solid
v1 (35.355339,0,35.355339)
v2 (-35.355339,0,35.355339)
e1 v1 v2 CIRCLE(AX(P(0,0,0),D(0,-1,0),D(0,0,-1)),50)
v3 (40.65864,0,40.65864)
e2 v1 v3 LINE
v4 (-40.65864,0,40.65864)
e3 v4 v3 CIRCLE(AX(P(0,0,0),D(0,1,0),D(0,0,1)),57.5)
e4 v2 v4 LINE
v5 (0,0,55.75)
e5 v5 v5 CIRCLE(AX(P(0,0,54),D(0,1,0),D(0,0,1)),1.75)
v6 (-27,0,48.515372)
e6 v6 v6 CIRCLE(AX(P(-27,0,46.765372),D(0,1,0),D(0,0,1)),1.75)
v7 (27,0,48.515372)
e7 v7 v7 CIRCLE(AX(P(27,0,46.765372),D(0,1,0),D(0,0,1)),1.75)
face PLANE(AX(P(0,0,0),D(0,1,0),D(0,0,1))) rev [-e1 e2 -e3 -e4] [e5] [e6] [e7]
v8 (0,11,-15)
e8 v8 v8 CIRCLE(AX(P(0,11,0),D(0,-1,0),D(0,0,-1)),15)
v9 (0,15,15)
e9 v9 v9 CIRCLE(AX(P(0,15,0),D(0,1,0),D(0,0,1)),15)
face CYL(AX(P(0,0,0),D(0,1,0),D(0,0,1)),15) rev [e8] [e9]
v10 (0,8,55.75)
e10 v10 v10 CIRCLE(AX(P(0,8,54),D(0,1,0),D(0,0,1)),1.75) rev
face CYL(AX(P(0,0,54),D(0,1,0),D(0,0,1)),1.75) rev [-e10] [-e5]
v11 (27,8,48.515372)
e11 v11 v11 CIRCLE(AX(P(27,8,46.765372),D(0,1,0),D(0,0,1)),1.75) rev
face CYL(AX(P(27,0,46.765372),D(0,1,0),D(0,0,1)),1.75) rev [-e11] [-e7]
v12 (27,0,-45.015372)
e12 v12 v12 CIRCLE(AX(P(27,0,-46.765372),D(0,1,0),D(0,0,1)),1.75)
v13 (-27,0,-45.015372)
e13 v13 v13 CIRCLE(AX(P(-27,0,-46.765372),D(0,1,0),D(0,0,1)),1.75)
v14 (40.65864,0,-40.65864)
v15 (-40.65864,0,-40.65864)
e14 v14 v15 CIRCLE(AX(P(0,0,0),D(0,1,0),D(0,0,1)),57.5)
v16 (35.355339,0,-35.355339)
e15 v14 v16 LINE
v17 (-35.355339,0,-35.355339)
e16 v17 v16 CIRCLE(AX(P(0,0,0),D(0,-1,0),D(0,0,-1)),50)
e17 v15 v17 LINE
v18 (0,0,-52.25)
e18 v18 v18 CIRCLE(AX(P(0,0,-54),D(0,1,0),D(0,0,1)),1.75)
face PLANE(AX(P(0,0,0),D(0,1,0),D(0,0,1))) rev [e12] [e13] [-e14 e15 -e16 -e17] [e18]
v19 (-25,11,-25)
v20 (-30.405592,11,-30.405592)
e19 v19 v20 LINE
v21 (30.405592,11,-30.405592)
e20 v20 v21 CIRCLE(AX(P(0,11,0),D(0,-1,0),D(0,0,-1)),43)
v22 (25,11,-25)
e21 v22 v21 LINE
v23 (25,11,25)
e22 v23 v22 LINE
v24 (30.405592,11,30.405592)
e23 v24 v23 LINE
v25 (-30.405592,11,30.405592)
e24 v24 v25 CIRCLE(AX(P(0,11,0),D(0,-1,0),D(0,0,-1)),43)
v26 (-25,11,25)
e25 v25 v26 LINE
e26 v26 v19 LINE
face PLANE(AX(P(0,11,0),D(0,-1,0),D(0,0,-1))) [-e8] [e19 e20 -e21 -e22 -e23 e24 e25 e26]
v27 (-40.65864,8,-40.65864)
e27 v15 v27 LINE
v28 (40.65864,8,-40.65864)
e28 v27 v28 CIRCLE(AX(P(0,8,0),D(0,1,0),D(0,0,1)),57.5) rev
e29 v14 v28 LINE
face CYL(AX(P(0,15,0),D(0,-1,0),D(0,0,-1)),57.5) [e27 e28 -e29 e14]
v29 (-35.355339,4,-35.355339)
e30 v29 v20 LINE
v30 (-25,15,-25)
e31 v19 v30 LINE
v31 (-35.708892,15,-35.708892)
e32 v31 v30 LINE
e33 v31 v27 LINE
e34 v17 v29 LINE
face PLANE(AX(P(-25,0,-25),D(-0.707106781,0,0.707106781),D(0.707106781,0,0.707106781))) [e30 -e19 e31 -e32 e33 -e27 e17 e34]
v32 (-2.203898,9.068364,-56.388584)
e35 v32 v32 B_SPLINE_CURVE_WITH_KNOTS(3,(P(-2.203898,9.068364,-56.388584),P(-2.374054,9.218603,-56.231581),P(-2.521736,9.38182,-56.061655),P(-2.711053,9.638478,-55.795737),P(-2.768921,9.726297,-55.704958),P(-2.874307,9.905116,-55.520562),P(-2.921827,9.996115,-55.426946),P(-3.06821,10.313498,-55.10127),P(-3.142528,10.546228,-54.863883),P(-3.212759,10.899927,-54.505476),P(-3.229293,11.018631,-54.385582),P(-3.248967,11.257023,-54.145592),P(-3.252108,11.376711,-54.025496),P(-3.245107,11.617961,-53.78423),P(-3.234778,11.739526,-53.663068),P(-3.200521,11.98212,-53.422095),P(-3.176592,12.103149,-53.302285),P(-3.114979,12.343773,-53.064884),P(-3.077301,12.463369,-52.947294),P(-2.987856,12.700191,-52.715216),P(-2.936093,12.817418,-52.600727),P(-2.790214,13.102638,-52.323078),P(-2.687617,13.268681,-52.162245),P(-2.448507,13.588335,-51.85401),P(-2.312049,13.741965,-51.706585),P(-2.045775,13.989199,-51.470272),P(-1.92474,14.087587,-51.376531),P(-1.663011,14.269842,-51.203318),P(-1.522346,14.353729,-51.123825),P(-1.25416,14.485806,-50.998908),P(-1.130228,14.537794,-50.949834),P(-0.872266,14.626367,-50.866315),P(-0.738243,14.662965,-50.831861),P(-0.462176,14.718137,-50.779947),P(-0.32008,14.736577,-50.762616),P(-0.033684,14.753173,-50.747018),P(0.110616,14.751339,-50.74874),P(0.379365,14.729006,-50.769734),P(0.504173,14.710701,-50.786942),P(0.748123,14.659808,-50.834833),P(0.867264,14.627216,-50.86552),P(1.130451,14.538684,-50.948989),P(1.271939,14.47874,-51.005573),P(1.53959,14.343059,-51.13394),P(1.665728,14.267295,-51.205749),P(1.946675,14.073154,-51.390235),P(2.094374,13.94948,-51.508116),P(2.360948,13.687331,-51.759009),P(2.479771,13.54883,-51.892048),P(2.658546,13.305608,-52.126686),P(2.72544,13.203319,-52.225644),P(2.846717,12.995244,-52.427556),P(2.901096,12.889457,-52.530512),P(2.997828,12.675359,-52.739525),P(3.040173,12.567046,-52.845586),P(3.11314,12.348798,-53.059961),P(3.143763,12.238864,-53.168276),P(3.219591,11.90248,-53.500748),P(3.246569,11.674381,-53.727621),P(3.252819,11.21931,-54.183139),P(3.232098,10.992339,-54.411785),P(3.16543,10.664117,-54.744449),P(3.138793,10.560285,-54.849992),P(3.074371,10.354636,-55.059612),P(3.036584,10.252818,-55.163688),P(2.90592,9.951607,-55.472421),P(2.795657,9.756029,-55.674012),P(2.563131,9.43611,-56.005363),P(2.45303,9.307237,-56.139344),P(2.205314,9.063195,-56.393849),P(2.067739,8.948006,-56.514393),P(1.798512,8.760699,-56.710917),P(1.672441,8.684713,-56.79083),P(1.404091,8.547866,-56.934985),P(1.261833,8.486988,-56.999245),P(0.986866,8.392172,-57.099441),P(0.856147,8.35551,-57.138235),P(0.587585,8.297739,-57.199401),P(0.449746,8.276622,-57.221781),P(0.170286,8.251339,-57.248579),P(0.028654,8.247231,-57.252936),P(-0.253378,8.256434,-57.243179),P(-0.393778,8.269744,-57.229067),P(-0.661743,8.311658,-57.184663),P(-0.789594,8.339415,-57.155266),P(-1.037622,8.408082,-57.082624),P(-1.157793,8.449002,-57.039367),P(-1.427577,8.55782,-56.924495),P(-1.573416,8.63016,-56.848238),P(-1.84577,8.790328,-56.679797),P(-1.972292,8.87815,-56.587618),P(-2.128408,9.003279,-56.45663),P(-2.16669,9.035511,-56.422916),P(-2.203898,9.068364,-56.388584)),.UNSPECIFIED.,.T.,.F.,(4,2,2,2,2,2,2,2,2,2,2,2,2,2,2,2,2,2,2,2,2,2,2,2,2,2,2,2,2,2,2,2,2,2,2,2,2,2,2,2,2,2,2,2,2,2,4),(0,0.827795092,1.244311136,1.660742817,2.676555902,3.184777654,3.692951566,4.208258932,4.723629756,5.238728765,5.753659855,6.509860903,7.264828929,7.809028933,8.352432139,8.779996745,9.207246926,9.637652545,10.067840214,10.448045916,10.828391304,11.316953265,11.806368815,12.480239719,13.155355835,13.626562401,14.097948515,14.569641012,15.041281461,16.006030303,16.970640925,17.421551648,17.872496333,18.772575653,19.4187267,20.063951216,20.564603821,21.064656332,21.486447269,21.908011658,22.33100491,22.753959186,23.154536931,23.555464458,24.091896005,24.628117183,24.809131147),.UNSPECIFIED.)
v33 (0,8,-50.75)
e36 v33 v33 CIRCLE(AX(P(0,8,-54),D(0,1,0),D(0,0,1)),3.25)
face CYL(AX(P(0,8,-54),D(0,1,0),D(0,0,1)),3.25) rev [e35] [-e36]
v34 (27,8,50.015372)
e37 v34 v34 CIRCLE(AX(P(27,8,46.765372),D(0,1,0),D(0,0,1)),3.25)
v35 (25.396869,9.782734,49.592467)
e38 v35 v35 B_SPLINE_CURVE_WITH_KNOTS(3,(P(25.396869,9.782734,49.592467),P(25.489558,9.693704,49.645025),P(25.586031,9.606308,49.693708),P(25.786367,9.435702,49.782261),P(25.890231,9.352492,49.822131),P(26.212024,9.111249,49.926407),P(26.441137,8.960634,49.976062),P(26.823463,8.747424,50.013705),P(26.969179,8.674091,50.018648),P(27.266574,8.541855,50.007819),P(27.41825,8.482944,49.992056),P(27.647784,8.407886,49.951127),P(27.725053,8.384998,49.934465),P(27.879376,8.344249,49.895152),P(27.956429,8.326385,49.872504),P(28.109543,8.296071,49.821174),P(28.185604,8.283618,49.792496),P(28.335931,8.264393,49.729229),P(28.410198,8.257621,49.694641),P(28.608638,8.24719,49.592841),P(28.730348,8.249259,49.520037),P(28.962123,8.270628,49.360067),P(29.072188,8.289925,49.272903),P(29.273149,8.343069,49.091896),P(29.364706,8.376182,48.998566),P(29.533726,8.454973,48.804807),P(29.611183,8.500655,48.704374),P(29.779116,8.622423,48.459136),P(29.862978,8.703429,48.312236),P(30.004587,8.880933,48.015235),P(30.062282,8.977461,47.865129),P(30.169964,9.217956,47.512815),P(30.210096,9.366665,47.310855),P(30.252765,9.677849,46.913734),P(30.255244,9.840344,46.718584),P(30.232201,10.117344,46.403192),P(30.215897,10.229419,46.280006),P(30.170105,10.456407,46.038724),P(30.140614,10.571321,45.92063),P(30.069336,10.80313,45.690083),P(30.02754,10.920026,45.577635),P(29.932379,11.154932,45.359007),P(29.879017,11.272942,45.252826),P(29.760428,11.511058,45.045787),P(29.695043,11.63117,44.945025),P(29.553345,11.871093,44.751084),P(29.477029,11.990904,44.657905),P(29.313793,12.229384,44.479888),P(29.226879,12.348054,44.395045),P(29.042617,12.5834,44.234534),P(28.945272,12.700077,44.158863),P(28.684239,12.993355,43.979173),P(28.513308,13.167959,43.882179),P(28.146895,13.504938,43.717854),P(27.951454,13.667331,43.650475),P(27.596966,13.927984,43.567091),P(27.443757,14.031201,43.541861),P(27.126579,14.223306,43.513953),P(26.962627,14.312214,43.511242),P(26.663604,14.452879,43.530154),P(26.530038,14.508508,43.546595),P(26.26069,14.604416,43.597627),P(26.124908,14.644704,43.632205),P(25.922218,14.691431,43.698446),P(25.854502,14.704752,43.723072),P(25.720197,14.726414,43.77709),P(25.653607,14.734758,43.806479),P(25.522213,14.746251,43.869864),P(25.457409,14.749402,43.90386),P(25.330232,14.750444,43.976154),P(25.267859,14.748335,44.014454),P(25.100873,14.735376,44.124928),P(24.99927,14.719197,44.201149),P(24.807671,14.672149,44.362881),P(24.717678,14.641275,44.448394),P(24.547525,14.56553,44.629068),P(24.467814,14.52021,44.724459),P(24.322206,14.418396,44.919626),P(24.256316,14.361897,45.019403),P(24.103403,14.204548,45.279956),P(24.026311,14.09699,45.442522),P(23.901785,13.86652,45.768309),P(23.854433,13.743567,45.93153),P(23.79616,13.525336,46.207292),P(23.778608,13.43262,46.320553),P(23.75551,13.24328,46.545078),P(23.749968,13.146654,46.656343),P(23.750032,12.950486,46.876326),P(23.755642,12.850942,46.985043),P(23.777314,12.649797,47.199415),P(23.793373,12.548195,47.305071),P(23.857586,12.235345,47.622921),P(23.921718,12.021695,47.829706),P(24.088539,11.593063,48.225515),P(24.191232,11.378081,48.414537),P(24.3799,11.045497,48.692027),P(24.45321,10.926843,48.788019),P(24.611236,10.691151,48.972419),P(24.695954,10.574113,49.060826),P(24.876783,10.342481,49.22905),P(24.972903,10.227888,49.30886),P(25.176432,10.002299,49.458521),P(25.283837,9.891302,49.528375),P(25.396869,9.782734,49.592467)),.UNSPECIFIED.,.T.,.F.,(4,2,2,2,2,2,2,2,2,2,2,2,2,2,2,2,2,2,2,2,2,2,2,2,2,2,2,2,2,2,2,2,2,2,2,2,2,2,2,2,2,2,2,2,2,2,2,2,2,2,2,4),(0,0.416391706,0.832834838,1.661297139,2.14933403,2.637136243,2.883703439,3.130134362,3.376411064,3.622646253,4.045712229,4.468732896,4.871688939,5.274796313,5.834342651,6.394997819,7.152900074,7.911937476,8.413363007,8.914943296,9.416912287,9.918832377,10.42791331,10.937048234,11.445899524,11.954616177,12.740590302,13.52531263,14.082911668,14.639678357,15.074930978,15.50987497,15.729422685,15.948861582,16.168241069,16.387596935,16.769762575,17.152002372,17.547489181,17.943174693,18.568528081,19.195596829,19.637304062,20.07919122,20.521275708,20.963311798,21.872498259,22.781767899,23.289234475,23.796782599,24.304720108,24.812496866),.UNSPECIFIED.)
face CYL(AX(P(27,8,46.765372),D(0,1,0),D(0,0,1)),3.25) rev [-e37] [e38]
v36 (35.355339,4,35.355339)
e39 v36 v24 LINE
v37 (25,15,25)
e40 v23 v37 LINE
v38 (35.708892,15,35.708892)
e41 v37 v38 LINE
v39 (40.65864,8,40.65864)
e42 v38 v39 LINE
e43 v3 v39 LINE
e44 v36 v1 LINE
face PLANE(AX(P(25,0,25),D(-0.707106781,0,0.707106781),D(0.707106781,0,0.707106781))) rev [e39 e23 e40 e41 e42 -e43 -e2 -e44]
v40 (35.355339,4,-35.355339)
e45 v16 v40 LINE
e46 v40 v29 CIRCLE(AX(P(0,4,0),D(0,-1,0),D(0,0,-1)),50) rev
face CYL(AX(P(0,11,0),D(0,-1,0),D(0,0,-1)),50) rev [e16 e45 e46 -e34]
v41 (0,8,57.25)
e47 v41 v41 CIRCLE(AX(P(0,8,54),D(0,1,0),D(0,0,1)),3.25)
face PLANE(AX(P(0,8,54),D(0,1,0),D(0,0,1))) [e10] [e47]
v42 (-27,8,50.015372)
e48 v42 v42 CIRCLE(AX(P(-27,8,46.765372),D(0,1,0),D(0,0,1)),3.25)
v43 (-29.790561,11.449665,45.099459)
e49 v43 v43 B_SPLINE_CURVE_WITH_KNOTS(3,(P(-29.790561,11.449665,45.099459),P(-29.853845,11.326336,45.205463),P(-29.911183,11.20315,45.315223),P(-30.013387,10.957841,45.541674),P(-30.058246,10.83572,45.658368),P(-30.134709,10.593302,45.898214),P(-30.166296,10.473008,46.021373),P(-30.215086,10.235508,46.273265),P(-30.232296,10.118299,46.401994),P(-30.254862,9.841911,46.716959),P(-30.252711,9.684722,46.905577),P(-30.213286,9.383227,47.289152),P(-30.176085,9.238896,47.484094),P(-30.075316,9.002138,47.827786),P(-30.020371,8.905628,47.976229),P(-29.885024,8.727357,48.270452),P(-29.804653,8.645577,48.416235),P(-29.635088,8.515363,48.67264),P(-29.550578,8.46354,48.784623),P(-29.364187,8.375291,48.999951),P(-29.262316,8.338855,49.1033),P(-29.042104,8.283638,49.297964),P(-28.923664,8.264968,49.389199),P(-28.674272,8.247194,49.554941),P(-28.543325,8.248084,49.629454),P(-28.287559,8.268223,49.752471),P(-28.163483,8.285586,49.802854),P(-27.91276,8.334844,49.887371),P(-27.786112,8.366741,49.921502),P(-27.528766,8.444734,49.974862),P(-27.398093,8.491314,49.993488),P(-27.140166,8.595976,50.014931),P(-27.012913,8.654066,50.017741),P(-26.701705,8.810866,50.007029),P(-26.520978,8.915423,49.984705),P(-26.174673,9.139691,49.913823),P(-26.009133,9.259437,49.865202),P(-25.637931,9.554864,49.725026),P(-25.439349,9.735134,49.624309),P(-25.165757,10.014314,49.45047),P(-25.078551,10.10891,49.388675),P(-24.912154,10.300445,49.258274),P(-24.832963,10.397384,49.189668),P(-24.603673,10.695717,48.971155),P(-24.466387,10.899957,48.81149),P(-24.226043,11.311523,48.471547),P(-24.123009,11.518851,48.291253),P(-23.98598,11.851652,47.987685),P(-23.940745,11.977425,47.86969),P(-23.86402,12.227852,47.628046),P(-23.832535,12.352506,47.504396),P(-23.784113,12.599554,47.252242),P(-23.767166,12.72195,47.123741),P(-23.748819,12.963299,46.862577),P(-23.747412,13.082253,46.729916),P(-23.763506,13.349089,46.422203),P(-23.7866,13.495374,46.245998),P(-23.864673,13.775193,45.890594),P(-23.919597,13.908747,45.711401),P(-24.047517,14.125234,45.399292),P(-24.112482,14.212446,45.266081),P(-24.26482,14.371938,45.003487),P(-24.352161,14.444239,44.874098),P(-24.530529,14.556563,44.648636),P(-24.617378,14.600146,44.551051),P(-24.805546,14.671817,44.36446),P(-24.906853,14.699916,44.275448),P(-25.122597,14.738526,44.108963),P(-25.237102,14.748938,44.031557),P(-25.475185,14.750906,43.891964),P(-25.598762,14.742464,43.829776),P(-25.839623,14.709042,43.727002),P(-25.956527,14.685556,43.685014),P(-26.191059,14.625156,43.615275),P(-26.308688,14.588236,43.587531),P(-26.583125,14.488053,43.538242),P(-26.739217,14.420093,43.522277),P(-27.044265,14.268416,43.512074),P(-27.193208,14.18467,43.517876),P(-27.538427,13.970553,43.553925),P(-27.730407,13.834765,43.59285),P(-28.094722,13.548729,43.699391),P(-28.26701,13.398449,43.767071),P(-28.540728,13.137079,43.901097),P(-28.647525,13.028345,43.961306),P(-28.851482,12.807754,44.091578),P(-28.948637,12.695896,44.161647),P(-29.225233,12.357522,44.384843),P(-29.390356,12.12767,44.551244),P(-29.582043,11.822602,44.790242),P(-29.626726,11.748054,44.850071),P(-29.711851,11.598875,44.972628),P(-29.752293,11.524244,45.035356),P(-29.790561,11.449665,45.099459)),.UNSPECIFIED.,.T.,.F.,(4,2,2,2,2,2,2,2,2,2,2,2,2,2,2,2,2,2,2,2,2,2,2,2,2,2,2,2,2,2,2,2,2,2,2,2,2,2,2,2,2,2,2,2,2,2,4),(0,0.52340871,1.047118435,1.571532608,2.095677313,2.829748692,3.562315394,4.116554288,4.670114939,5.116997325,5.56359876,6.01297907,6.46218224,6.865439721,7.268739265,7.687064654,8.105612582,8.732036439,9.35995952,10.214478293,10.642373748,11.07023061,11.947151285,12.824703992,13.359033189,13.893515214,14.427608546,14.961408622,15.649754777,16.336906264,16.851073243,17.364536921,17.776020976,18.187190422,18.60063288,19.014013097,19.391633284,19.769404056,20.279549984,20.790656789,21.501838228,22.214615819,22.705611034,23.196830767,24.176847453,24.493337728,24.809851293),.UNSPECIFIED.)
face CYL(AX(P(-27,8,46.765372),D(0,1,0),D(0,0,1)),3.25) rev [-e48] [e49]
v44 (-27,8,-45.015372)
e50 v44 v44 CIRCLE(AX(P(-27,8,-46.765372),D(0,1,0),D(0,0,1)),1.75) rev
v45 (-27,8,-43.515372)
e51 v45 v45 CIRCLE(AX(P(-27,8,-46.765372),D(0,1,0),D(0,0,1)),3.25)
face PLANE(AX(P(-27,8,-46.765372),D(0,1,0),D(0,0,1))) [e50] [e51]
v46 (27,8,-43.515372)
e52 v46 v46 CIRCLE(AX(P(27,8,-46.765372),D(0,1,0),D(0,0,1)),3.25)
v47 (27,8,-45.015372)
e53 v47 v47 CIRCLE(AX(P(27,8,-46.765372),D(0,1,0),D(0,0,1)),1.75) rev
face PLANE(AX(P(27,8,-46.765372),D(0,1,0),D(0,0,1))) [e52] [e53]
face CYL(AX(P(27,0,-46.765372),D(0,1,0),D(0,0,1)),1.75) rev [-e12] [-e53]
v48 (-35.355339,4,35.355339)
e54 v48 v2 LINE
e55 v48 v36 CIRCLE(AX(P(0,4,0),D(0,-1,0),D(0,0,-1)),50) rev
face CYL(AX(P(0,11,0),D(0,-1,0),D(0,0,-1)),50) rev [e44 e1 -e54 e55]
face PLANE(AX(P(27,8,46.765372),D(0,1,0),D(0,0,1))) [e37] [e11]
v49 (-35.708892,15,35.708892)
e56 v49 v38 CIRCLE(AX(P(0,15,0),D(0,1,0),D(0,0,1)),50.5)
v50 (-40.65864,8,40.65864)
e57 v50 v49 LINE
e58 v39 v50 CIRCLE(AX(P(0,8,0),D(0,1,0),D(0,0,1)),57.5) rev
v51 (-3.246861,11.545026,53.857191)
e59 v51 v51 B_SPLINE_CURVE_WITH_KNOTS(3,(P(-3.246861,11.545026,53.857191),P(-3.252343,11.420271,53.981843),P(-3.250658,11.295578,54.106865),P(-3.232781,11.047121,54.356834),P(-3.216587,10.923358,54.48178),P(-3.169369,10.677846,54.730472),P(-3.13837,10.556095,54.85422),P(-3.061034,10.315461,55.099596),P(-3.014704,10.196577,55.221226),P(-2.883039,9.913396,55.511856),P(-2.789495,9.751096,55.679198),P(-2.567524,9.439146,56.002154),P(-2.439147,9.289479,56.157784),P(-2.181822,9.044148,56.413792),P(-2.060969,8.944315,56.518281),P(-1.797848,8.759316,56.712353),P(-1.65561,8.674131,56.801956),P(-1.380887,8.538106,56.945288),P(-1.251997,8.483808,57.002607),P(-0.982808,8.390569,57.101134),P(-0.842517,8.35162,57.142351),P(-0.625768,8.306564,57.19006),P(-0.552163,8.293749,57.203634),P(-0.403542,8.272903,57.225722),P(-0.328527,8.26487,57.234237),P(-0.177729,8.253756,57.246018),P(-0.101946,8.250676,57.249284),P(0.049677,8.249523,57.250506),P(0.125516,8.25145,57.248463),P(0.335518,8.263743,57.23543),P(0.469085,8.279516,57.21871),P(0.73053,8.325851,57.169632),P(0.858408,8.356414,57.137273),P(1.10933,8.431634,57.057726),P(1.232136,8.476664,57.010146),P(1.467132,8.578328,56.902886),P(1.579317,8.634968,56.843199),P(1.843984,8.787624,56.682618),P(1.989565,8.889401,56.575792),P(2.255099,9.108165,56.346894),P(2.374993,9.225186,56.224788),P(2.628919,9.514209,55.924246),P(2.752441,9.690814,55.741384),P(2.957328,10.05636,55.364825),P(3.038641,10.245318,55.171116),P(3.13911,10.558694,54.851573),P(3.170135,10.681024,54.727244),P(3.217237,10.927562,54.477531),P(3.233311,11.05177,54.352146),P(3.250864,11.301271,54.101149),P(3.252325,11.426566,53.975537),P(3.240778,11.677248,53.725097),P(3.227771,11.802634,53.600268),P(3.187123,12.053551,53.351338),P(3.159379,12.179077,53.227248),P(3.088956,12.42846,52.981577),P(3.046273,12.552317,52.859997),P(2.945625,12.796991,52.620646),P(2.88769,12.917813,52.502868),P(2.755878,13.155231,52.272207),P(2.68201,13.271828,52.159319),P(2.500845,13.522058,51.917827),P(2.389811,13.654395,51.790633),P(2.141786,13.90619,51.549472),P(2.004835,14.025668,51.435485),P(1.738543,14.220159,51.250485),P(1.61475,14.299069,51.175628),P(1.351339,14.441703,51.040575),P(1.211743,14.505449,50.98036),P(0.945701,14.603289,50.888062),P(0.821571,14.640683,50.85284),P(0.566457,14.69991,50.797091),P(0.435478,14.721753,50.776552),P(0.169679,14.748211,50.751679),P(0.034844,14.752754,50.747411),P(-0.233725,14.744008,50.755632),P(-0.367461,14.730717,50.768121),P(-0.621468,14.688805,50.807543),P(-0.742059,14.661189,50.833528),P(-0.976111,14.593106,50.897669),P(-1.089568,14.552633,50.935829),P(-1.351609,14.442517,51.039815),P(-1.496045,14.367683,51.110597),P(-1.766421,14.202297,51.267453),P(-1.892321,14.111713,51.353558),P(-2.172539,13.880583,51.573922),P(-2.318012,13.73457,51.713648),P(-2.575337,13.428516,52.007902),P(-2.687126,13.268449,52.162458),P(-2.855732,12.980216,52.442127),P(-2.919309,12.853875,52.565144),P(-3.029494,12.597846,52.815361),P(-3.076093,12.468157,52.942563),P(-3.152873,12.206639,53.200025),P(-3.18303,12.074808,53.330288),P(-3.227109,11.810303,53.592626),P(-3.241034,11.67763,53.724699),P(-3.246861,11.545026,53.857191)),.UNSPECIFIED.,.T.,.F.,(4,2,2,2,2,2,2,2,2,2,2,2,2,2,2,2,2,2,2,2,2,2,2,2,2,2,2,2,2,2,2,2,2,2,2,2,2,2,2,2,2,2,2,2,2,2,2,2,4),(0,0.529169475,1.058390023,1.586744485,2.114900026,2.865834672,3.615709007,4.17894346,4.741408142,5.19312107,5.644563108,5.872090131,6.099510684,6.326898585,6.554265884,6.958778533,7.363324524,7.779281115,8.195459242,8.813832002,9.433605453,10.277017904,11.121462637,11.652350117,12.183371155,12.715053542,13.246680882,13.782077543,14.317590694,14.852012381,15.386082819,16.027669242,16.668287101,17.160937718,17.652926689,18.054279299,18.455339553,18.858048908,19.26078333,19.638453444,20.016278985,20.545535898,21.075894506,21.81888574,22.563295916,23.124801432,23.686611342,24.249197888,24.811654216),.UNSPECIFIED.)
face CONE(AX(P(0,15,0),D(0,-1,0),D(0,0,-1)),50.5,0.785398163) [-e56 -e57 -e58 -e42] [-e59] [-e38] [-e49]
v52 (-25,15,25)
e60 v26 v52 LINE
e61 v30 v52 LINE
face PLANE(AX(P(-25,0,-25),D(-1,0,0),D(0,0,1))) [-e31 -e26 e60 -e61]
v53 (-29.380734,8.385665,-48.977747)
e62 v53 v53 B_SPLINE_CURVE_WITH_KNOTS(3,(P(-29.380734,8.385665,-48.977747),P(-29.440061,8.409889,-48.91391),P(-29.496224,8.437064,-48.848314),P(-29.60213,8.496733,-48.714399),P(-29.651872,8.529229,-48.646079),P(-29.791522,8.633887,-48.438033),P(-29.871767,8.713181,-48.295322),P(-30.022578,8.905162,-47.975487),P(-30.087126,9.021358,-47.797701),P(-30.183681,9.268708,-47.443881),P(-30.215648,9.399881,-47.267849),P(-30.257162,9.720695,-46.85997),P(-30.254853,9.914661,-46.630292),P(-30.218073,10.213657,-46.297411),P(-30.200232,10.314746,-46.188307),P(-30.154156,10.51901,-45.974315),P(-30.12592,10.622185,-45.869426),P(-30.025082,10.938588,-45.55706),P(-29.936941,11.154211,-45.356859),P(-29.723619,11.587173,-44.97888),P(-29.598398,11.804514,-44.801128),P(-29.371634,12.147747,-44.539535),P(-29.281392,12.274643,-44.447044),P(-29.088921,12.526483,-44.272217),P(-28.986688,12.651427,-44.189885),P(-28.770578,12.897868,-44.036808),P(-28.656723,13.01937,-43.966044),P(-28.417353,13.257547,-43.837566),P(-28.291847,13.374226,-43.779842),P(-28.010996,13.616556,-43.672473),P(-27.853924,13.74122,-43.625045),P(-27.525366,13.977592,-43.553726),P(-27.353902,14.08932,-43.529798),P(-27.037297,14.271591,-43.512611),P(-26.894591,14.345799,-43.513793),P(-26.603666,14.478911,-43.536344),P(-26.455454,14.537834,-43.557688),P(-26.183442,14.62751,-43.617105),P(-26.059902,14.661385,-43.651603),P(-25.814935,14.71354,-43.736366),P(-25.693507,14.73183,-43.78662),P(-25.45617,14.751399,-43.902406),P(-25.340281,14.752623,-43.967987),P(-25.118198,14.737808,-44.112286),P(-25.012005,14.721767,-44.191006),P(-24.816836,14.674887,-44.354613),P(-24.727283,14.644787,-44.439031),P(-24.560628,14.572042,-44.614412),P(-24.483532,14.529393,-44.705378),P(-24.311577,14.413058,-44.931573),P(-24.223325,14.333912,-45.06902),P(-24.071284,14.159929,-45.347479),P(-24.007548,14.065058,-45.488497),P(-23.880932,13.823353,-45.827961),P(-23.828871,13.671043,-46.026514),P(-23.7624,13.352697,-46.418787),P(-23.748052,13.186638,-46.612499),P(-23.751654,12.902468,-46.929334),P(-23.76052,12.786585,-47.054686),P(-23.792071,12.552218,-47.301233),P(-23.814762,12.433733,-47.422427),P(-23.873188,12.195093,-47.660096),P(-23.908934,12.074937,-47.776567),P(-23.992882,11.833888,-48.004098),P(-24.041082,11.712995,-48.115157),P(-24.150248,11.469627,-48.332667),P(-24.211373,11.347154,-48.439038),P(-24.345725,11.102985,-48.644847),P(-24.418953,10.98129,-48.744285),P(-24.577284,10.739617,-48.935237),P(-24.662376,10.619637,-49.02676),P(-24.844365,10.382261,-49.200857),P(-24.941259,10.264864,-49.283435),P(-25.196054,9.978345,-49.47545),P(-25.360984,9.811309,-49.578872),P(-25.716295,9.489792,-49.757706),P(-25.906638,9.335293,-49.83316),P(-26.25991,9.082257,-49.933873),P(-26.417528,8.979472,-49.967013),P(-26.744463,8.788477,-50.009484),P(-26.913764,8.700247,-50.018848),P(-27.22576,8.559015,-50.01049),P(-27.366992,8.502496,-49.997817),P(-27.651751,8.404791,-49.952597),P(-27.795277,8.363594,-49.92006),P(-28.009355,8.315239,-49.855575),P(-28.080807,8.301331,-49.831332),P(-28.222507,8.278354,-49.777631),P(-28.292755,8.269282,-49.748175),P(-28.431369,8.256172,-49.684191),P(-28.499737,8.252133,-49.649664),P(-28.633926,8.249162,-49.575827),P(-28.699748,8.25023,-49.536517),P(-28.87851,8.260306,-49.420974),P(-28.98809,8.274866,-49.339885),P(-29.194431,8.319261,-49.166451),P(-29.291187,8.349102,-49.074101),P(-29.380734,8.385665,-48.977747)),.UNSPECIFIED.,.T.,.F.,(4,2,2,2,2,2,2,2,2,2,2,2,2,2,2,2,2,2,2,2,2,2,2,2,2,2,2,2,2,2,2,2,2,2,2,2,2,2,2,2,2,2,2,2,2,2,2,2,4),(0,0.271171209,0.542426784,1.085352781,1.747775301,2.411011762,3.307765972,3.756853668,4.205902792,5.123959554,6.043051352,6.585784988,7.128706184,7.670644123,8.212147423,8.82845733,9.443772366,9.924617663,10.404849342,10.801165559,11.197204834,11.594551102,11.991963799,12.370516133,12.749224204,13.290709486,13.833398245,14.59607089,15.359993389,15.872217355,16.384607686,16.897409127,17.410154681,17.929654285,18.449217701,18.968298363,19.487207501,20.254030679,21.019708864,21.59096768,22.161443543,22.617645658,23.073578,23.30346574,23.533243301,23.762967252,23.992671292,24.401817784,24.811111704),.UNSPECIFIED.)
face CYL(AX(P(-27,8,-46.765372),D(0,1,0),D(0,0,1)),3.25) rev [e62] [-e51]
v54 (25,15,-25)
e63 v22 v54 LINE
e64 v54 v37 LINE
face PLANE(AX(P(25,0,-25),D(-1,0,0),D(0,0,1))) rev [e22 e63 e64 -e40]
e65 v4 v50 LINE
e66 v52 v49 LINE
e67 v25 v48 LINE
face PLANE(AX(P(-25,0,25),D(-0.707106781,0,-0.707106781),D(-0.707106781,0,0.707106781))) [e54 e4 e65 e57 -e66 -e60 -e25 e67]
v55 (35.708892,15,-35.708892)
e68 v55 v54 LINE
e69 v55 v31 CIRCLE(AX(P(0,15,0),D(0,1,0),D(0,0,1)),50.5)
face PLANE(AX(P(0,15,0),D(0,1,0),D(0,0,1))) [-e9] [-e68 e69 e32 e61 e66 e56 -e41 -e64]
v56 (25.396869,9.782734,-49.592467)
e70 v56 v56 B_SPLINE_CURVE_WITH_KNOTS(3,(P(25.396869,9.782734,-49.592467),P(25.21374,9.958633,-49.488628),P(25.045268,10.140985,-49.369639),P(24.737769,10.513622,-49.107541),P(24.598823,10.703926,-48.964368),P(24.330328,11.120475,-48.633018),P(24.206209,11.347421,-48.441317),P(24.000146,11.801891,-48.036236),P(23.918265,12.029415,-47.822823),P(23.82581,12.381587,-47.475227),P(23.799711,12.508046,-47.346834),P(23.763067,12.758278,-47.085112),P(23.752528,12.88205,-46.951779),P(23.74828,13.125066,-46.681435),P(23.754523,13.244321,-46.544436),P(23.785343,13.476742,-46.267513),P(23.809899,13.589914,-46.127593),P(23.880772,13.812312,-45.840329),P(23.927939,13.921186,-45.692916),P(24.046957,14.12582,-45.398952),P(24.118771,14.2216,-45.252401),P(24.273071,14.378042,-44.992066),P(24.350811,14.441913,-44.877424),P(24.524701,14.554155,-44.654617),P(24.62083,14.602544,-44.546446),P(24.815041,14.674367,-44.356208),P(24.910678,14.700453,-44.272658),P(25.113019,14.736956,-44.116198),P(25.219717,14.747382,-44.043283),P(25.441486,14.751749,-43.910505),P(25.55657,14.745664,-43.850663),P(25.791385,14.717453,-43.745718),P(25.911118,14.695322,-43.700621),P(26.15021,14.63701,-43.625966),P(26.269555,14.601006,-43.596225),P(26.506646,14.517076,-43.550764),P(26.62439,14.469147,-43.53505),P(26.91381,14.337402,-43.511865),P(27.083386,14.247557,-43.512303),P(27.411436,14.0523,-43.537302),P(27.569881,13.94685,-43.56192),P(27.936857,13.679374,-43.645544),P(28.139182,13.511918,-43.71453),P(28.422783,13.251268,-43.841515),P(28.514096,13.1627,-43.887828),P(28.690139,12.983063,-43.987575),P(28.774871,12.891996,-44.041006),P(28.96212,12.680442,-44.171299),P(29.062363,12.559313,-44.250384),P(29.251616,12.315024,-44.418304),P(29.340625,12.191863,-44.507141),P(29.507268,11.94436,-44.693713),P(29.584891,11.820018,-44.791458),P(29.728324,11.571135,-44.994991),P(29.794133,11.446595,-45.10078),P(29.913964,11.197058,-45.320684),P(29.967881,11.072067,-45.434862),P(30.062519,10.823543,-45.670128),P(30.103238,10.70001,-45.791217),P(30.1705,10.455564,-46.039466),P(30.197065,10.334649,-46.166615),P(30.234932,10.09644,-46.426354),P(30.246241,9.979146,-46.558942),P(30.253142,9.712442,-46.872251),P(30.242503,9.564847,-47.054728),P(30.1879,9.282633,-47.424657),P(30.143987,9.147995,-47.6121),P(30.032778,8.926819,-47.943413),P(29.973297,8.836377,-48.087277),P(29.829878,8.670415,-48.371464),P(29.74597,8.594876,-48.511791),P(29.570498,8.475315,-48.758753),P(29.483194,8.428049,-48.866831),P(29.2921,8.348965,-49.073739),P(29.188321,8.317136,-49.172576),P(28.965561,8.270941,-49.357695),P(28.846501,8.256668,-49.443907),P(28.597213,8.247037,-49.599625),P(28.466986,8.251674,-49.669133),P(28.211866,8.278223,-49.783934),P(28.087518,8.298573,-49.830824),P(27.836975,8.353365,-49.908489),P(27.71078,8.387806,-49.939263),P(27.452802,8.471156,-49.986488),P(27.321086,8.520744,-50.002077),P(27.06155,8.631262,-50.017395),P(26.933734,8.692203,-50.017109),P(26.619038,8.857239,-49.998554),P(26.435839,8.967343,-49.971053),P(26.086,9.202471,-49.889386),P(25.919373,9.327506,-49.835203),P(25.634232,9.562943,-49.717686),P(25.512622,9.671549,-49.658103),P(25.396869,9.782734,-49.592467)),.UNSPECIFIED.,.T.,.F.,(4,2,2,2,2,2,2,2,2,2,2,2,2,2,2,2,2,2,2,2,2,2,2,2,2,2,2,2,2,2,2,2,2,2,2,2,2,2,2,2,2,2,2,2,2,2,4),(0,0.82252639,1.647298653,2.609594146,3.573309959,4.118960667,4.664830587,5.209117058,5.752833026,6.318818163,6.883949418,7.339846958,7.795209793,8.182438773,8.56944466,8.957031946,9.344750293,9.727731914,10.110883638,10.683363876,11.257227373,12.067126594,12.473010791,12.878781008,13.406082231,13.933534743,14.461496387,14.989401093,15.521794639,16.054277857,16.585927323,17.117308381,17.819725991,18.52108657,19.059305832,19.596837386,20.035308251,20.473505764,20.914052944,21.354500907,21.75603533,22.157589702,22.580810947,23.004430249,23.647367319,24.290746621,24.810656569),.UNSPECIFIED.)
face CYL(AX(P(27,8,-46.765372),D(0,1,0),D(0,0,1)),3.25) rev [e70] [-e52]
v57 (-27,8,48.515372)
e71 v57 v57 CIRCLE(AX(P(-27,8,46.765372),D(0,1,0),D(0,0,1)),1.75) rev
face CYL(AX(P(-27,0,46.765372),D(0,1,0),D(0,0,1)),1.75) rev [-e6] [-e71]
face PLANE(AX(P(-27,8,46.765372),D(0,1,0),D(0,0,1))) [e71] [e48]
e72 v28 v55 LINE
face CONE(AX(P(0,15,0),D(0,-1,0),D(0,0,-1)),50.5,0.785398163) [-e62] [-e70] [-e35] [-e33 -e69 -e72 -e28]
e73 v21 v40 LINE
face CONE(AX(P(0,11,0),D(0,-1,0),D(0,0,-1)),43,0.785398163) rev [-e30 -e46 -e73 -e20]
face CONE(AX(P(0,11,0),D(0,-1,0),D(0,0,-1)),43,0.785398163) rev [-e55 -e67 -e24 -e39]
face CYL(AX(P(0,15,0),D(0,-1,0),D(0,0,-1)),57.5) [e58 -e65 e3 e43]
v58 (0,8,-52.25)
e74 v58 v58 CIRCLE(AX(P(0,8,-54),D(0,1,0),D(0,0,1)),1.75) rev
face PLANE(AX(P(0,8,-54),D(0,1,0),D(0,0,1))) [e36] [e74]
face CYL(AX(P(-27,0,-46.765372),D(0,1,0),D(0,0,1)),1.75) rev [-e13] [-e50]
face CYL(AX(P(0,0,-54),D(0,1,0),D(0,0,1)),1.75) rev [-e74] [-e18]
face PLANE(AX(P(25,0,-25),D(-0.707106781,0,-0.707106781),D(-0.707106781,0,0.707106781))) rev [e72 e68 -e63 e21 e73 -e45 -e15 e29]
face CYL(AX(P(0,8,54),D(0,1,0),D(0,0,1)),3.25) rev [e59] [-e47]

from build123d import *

# Parameters (mm, degrees)
SKETCH1_R           = 57.5
BOSS_EXTRUDE1_DEPTH = 15
SKETCH2_R           = 50
CUT_EXTRUDE1_DEPTH  = 11
SKETCH3_R           = 1.75
SKETCH3_R_2         = 15
CUT_EXTRUDE2_DEPTH  = 15
CUT_EXTRUDE3_START  = -15
CUT_EXTRUDE3_DEPTH  = 15
CHAMFER1_SIZE       = 7
SKETCH5_R           = 3.25
CUT_EXTRUDE4_DEPTH  = 7


with BuildPart() as part:
    # Sketch1 → Boss-Extrude1 (new body)
    with BuildSketch(Plane(origin=(0, 0, 0), x_dir=(1, 0, 0), z_dir=(0, 1, 0))):
        with Locations(Location((0, 0, 0), (0, 0, 270))):
            Circle(SKETCH1_R)
    extrude(amount=BOSS_EXTRUDE1_DEPTH)

    # Sketch2 → Cut-Extrude1 (cut)
    with BuildSketch(Plane.XZ):
        with Locations(Location((0, 0, 0), (0, 0, 270))):
            Circle(SKETCH2_R)
    extrude(amount=-CUT_EXTRUDE1_DEPTH, mode=Mode.SUBTRACT)

    # Sketch3 → Cut-Extrude2 (cut)
    with BuildSketch(Plane(origin=(0, 15, 0), x_dir=(1, 0, 0), z_dir=(0, 1, 0))):
        with Locations(Location((0, 54, 0), (0, 0, 270))):
            Circle(SKETCH3_R)
        with Locations(Location((27, 46.765371804, 0), (0, 0, 270))):
            Circle(SKETCH3_R)
        with Locations(Location((46.765371804, 27, 0), (0, 0, 270))):
            Circle(SKETCH3_R)
        with Locations(Location((54, 0, 0), (0, 0, 270))):
            Circle(SKETCH3_R)
        with Locations(Location((46.765371804, -27, 0), (0, 0, 270))):
            Circle(SKETCH3_R)
        with Locations(Location((27, -46.765371804, 0), (0, 0, 270))):
            Circle(SKETCH3_R)
        with Locations(Location((0, -54, 0), (0, 0, 270))):
            Circle(SKETCH3_R)
        with Locations(Location((-27, -46.765371804, 0), (0, 0, 270))):
            Circle(SKETCH3_R)
        with Locations(Location((-46.765371804, -27, 0), (0, 0, 270))):
            Circle(SKETCH3_R)
        with Locations(Location((-54, 0, 0), (0, 0, 270))):
            Circle(SKETCH3_R)
        with Locations(Location((-46.765371804, 27, 0), (0, 0, 270))):
            Circle(SKETCH3_R)
        with Locations(Location((-27, 46.765371804, 0), (0, 0, 270))):
            Circle(SKETCH3_R)
        with Locations(Location((0, 0, 0), (0, 0, 270))):
            Circle(SKETCH3_R_2)
    extrude(amount=-CUT_EXTRUDE2_DEPTH, mode=Mode.SUBTRACT)

    # Sketch4 → Cut-Extrude3 (cut)
    with BuildSketch(Plane(origin=(0, 15, 0), x_dir=(1, 0, 0), z_dir=(0, 1, 0)).offset(CUT_EXTRUDE3_START)):
        with BuildLine():
            Line((25, 25), (40.658639918, 40.658639918))
            ThreePointArc((40.658639918, 40.658639918), (57.5, 0), (40.658639918, -40.658639918))
            Line((40.658639918, -40.658639918), (25, -25))
            Line((25, -25), (25, 25))
        make_face()
    cut_extrude3 = extrude(amount=CUT_EXTRUDE3_DEPTH, mode=Mode.SUBTRACT)

    # Mirror1: Cut-Extrude3 across plane
    add(cut_extrude3.mirror(Plane(origin=(0, 0, 0), x_dir=(0, 0, 1), z_dir=(1, 0, 0))), mode=Mode.SUBTRACT)

    # Chamfer1
    # the kernel refuses this chamfer: 7 mm, written as the material it adds along each edge
    with BuildSketch(Plane(origin=(0, 11, 0), x_dir=(-0.7071067811865476, 0, 0.7071067811865476), z_dir=(-0.7071067811865476, 0, -0.7071067811865476))) as chamfer1_piece_1:
        Polygon((50 - CHAMFER1_SIZE, 0), (50, -CHAMFER1_SIZE), (50, 0), align=None)
    revolve(axis=Axis((0, 11, 0), (0, 1, 0)), revolution_arc=90)
    with BuildSketch(Plane(origin=(0, 11, 0), x_dir=(0.7071067811865475, 0, -0.7071067811865477), z_dir=(0.7071067811865477, 0, 0.7071067811865475))) as chamfer1_piece_2:
        Polygon((50, -CHAMFER1_SIZE), (50 - CHAMFER1_SIZE, 0), (50, 0), align=None)
    revolve(axis=Axis((0, 11, 0), (0, 1, 0)), revolution_arc=90)
    # the kernel refuses this chamfer: 7 mm, written as the material it takes off along each edge
    with BuildSketch(Plane(origin=(0, 15, 0), x_dir=(-0.890570714861766, 0, -0.4548448107108656), z_dir=(-0.4548448107108656, 0, 0.890570714861766))) as chamfer1_2_piece_1:
        Polygon((57.5, CHAMFER1_SIZE), (57.5 - CHAMFER1_SIZE, 0), (57.5, 0), align=None)
    revolve(axis=Axis((0, 15, 0), (0, -1, 0)), revolution_arc=125.890100955, mode=Mode.SUBTRACT)
    with BuildSketch(Plane(origin=(0, 15, 0), x_dir=(0.890570714861766, 0, 0.4548448107108656), z_dir=(0.4548448107108656, 0, -0.890570714861766))) as chamfer1_2_piece_2:
        Polygon((57.5 - CHAMFER1_SIZE, 0), (57.5, CHAMFER1_SIZE), (57.5, 0), align=None)
    revolve(axis=Axis((0, 15, 0), (0, -1, 0)), revolution_arc=125.890100955, mode=Mode.SUBTRACT)

    # Sketch5 → Cut-Extrude4 (cut)
    with BuildSketch(Plane(origin=(0, 15, 0), x_dir=(1, 0, 0), z_dir=(0, 1, 0))):
        with Locations(Location((0, 54, 0), (0, 0, 270))):
            Circle(SKETCH5_R)
        with Locations(Location((27, 46.765371804, 0), (0, 0, 270))):
            Circle(SKETCH5_R)
        with Locations((46.765371804, 27)):
            Circle(SKETCH5_R)
        with Locations((54, 0)):
            Circle(SKETCH5_R)
        with Locations((46.765371804, -27)):
            Circle(SKETCH5_R)
        with Locations(Location((27, -46.765371804, 0), (0, 0, 270))):
            Circle(SKETCH5_R)
        with Locations(Location((0, -54, 0), (0, 0, 270))):
            Circle(SKETCH5_R)
        with Locations(Location((-27, -46.765371804, 0), (0, 0, 270))):
            Circle(SKETCH5_R)
        with Locations((-46.765371804, -27)):
            Circle(SKETCH5_R)
        with Locations((-54, 0)):
            Circle(SKETCH5_R)
        with Locations((-46.765371804, 27)):
            Circle(SKETCH5_R)
        with Locations(Location((-27, 46.765371804, 0), (0, 0, 270))):
            Circle(SKETCH5_R)
    extrude(amount=-CUT_EXTRUDE4_DEPTH, mode=Mode.SUBTRACT)


solid = part.part
